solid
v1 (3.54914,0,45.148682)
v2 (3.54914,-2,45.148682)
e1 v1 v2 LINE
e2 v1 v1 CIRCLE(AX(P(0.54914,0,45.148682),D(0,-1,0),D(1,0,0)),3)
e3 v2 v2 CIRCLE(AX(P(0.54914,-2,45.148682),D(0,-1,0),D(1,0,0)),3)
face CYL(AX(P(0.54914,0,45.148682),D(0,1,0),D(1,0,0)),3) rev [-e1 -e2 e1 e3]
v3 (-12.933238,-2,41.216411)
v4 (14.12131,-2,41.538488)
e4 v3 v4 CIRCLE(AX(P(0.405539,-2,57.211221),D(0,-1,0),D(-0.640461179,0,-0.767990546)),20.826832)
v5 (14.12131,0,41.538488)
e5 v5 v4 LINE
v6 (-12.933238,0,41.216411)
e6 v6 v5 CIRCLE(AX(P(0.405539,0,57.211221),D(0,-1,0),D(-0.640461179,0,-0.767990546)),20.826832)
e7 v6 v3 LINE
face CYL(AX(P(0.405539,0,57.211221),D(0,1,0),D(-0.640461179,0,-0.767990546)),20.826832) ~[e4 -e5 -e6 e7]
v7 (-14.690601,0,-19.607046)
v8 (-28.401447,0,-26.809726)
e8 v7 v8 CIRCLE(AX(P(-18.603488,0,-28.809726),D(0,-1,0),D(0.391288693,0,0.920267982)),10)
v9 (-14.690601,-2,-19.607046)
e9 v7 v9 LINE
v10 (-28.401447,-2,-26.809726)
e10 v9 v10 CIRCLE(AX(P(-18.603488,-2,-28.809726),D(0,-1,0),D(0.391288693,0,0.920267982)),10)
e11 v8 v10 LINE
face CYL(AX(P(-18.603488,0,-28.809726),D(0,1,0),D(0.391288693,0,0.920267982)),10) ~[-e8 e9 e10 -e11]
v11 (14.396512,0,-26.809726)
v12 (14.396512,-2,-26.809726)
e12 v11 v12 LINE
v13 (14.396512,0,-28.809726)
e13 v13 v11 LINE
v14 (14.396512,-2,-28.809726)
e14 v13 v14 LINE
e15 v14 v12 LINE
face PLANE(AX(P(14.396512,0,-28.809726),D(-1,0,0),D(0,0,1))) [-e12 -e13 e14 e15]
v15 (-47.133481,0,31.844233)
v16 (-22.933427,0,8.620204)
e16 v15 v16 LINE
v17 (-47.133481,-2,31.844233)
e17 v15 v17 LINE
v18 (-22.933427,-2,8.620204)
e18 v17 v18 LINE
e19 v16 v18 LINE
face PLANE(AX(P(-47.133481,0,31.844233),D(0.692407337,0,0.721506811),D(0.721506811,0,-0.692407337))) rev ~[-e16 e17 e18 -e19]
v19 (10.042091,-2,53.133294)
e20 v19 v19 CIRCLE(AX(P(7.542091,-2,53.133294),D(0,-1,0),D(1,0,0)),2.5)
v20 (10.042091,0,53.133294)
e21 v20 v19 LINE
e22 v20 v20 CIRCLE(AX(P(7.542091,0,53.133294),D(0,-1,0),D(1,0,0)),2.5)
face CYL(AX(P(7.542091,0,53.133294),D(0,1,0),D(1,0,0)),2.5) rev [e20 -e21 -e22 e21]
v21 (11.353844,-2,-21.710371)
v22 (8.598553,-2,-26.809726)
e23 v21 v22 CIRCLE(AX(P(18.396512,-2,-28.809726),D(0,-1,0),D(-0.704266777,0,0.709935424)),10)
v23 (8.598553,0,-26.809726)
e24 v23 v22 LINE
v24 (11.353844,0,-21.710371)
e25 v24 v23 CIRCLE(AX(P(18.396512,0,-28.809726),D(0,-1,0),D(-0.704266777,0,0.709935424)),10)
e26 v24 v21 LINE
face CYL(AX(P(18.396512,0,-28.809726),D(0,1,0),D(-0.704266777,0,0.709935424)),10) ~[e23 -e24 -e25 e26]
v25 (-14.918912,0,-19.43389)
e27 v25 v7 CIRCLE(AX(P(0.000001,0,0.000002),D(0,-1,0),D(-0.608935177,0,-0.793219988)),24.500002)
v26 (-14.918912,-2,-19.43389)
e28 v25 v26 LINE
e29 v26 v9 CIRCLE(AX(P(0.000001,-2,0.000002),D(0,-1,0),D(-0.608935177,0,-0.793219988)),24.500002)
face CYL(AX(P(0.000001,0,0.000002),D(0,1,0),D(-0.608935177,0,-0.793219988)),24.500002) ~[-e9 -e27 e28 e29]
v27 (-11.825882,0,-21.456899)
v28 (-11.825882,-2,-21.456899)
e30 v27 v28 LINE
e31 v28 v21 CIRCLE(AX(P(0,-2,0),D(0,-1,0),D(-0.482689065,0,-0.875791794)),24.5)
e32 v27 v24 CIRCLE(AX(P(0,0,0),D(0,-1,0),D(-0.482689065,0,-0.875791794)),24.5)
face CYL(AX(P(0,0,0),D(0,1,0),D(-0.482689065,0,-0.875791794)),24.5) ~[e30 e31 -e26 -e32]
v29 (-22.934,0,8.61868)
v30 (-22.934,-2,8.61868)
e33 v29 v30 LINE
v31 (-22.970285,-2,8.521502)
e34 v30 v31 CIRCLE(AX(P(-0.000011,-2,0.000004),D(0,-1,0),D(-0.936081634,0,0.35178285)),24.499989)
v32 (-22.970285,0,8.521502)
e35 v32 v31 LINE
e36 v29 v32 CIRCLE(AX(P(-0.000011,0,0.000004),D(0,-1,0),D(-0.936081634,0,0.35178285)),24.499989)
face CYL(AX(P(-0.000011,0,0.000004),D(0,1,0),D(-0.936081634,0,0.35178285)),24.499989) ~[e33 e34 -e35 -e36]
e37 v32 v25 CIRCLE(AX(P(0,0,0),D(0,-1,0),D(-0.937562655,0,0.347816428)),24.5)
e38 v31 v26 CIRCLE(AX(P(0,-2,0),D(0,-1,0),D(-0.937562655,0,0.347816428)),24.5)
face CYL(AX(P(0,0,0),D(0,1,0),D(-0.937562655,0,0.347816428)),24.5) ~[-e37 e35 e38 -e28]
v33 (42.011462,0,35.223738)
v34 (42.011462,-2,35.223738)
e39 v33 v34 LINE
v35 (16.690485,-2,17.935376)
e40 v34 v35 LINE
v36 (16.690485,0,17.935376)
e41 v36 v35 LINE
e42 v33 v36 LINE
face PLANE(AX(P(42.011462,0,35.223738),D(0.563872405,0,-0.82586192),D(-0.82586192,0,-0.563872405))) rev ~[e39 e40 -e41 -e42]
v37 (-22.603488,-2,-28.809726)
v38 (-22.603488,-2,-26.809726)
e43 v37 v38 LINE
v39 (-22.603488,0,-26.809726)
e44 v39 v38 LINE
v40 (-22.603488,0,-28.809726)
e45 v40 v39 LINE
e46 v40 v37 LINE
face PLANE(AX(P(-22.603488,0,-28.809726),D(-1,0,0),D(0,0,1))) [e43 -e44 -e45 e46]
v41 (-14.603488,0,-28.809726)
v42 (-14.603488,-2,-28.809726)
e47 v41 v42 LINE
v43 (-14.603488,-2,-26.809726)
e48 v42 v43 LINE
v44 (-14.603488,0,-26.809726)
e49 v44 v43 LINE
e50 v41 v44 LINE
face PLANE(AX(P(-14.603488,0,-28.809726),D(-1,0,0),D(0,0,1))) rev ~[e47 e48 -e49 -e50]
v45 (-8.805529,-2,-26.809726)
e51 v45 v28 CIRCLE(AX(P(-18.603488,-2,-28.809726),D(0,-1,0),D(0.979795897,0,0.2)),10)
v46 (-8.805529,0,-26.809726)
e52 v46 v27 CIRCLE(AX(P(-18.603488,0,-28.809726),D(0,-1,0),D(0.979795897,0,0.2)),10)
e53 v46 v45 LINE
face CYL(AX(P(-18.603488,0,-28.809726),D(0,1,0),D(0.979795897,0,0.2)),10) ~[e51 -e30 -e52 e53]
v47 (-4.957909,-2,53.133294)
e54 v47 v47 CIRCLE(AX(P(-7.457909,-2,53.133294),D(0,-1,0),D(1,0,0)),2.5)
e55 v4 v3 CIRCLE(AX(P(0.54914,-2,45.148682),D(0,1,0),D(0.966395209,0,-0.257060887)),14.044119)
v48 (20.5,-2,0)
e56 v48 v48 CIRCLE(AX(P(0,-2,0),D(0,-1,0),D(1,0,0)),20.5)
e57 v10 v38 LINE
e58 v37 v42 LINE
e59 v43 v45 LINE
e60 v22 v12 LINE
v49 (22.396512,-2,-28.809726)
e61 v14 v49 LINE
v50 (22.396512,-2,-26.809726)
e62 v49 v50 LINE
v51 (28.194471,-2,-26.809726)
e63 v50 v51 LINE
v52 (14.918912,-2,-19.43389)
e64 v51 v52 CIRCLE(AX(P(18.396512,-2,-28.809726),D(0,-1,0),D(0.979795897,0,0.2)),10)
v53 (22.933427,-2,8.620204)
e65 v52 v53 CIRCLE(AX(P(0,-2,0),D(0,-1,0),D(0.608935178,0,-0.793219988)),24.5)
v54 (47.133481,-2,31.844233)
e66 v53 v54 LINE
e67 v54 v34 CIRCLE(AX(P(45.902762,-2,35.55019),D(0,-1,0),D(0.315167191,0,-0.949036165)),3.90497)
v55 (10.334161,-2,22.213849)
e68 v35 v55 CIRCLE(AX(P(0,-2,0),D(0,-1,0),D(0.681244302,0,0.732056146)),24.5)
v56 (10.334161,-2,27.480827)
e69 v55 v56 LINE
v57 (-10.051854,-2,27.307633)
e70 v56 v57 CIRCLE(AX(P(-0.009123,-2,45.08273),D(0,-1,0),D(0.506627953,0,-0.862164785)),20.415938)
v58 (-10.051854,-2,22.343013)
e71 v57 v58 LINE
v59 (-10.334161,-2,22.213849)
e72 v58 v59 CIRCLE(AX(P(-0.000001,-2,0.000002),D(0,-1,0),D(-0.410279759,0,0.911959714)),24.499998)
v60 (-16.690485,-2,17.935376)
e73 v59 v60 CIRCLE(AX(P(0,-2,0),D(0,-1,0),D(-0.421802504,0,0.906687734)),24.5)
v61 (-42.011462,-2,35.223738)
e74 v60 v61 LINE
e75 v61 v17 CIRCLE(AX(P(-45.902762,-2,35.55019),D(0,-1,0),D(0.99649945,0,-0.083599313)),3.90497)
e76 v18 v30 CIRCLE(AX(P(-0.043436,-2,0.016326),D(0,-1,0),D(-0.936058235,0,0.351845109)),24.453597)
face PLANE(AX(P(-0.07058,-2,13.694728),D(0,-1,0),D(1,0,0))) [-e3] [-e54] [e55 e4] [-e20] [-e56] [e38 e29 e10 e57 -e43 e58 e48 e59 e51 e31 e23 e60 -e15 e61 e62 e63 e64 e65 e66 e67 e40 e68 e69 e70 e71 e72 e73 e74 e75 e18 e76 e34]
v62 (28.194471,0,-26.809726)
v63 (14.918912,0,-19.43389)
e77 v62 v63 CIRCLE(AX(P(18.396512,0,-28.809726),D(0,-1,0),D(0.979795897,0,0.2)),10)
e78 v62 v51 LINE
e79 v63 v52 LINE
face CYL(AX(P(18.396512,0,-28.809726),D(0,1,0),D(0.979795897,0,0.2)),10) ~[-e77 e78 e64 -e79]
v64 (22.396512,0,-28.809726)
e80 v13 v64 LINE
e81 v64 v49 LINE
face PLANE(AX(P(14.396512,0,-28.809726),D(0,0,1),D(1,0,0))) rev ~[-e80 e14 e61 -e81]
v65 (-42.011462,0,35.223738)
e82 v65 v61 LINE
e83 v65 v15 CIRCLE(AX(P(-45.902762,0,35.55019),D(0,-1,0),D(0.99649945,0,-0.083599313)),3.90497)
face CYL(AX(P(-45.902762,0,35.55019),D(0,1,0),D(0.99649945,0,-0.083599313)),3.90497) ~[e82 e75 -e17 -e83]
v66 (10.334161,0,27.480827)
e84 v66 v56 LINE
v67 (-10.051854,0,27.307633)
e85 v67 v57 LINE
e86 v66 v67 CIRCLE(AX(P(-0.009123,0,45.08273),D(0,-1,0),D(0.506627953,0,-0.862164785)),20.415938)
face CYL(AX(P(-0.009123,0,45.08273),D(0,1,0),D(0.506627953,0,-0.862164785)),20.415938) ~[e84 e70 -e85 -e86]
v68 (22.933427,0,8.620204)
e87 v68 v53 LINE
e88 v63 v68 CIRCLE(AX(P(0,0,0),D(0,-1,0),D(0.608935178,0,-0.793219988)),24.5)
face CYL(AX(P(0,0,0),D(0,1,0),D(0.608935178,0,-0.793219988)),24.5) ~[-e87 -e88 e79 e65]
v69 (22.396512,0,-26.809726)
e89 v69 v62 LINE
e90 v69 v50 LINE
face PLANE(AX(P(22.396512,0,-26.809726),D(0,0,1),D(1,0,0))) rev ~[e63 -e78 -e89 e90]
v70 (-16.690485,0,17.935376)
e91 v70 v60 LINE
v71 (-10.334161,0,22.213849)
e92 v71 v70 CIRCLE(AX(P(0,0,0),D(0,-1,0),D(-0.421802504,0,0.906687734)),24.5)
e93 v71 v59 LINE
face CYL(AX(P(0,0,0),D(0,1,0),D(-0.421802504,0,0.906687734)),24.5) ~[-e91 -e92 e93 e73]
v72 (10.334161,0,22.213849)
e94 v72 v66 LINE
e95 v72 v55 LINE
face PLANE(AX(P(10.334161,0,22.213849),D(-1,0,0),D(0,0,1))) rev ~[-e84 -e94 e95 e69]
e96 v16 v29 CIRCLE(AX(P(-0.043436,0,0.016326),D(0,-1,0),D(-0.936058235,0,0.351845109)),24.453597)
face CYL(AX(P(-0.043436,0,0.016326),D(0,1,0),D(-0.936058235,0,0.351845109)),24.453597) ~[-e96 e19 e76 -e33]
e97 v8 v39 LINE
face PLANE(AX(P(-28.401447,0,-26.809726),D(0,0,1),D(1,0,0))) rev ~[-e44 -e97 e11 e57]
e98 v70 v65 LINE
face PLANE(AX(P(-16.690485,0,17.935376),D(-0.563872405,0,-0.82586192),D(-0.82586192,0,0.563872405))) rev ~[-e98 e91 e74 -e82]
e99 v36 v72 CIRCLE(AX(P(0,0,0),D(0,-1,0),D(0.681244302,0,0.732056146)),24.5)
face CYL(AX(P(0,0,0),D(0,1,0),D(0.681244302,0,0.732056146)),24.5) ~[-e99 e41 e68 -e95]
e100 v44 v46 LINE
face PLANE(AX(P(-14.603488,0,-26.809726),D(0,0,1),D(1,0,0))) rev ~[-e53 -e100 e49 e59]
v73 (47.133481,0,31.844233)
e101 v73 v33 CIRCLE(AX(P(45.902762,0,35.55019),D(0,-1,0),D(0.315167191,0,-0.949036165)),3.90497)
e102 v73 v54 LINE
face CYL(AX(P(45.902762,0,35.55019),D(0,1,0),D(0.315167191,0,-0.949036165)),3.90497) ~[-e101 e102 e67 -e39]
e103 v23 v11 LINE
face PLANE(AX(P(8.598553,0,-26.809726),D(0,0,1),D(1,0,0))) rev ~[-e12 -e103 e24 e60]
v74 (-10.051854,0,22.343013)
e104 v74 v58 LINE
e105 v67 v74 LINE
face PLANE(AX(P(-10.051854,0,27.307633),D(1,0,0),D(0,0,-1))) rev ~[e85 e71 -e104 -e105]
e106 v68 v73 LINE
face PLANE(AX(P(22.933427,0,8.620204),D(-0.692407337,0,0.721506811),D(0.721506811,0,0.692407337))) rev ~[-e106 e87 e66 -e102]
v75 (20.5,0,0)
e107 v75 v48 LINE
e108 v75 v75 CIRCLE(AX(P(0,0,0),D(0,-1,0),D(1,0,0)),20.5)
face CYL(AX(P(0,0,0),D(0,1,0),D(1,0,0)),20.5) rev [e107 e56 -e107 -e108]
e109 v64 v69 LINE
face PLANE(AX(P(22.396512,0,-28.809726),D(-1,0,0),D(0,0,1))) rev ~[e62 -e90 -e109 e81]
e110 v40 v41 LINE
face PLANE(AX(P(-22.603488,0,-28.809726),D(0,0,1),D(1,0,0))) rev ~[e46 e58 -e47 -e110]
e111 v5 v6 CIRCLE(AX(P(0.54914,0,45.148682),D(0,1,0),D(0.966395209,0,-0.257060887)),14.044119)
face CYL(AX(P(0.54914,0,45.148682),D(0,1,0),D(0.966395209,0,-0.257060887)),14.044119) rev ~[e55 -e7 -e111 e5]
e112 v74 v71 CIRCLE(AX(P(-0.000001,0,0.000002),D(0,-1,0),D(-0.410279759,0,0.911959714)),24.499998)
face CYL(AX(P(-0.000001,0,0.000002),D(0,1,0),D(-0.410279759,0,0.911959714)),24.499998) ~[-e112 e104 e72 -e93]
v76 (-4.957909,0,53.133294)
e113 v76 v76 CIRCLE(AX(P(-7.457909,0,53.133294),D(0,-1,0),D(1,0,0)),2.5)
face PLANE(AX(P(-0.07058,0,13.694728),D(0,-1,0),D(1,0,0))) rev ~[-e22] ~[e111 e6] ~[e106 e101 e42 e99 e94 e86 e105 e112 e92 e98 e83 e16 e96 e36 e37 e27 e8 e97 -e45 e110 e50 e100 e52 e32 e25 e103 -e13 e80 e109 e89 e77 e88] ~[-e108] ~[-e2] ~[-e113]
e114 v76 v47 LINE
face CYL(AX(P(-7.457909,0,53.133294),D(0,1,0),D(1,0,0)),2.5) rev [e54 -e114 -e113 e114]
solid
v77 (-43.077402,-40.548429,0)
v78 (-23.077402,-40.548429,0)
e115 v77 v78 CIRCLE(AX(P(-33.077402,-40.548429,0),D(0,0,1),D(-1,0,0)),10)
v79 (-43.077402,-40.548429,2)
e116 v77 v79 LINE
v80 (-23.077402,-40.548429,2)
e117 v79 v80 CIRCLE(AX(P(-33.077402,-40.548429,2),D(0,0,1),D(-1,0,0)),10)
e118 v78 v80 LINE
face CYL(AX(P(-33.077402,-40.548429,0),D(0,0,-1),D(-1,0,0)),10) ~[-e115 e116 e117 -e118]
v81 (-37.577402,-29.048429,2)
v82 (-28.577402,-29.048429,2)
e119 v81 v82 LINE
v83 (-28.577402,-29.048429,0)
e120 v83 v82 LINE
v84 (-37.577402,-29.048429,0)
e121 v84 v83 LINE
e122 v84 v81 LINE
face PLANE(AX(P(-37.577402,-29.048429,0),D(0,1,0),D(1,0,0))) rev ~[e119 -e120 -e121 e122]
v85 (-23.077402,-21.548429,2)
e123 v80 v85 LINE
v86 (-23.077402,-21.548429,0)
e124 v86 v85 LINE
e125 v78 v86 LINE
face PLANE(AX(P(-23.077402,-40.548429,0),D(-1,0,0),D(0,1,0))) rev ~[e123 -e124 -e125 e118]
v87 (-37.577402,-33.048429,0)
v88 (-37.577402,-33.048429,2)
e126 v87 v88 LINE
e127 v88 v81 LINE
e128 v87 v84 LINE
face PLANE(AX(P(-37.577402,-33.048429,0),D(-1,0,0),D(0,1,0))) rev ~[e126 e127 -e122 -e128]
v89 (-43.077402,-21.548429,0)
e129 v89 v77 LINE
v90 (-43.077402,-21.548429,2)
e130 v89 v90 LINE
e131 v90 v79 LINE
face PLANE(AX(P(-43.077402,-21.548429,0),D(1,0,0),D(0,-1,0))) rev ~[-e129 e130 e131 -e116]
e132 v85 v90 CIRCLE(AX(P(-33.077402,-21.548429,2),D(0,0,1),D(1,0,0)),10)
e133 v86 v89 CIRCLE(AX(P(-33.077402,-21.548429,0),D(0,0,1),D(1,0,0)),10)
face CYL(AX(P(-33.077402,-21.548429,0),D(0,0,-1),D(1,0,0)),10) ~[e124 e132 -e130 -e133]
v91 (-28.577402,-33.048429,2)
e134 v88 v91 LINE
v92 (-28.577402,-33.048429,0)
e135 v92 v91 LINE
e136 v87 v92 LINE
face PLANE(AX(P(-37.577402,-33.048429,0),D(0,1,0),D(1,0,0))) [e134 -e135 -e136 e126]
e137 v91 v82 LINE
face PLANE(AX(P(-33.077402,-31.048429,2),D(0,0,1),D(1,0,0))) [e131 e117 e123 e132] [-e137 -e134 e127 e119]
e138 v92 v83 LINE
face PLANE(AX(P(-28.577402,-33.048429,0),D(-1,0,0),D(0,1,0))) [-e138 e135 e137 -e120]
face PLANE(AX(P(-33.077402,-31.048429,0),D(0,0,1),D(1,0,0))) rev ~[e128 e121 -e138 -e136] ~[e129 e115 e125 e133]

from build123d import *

# Parameters (mm, degrees)
F0_R     = 20.5
F0_R_2   = 2.5
F0_R_3   = 3
F0_W     = 8
F0_H     = 2
F1_DEPTH = 2
F2_W     = 9
F2_H     = 4
F3_DEPTH = 2


# Not quite as in the source:
# - a feature names something its author has since deleted; it is built from what else it names


with BuildPart() as f1:
    # F0 (on Front) → F1 (new body)
    with BuildSketch(Plane.XZ):
        with BuildLine():
            Line((-10.0518541032, 27.3076325654), (-10.0518541032, 22.3430129814))
            ThreePointArc((-10.0518541032, 22.3430129814), (-10.1932123132, 22.2788783995), (-10.3341613447, 22.2138494931))
            ThreePointArc((-10.3341613447, 22.2138494931), (-13.6806146729, 20.3246348595), (-16.6904854096, 17.9353755688))
            Line((-16.6904854096, 17.9353755688), (-42.0114619192, 35.2237376845))
            ThreePointArc((-42.0114619192, 35.2237376845), (-48.0533290823, 38.8096157049), (-47.1334807155, 31.8442328026))
            Line((-47.1334807155, 31.8442328026), (-22.9334270643, 8.620204353))
            ThreePointArc((-22.9334270643, 8.620204353), (-22.9337135716, 8.6194420827), (-22.9340000535, 8.6186798029))
            ThreePointArc((-22.9340000535, 8.6186798029), (-22.9521939831, 8.5701103472), (-22.9702850527, 8.5215024848))
            ThreePointArc((-22.9702850527, 8.5215024848), (-23.543020169, -6.7805752945), (-14.9189118524, -19.4338897069))
            ThreePointArc((-14.9189118524, -19.4338897069), (-14.8050096032, -19.5208014858), (-14.6906010516, -19.6070456914))
            ThreePointArc((-14.6906010516, -19.6070456914), (-23.2540973357, -19.9569387989), (-28.4014469494, -26.809725513))
            Line((-28.4014469494, -26.809725513), (-22.6034879783, -26.809725513))
            Line((-22.6034879783, -26.809725513), (-14.6034879783, -26.809725513))
            Line((-14.6034879783, -26.809725513), (-8.8055290071, -26.809725513))
            ThreePointArc((-8.8055290071, -26.809725513), (-9.8942672501, -23.8955140495), (-11.8258820824, -21.4568989598))
            ThreePointArc((-11.8258820824, -21.4568989598), (-0.2678936029, -24.4985353239), (11.3538442484, -21.7103712724))
            ThreePointArc((11.3538442484, -21.7103712724), (9.5986412165, -24.0560459597), (8.5985530506, -26.809725513))
            Line((8.5985530506, -26.809725513), (14.3965120217, -26.809725513))
            Line((14.3965120217, -26.809725513), (22.3965120217, -26.809725513))
            Line((22.3965120217, -26.809725513), (28.1944709929, -26.809725513))
            ThreePointArc((28.1944709929, -26.809725513), (23.2532055786, -20.0682995598), (14.9189118524, -19.4338897069))
            ThreePointArc((14.9189118524, -19.4338897069), (23.5575452615, -6.7299376857), (22.9334270643, 8.620204353))
            Line((22.9334270643, 8.620204353), (47.1334807155, 31.8442328026))
            ThreePointArc((47.1334807155, 31.8442328026), (48.0533290823, 38.8096157049), (42.0114619192, 35.2237376845))
            Line((42.0114619192, 35.2237376845), (16.6904854096, 17.9353755688))
            ThreePointArc((16.6904854096, 17.9353755688), (13.6806146729, 20.3246348595), (10.3341613447, 22.2138494931))
            Line((10.3341613447, 22.2138494931), (10.3341613447, 27.4808270977))
            ThreePointArc((10.3341613447, 27.4808270977), (-0.1825659758, 65.4979309649), (-10.0518541032, 27.3076325654))
        make_face()
        Circle(F0_R, mode=Mode.SUBTRACT)
        with Locations((-7.4579087086, 53.1332939863)):
            Circle(F0_R_2, mode=Mode.SUBTRACT)
        with BuildLine():
            ThreePointArc((14.1213098541, 41.5384881198), (0.7163199464, 31.1055576115), (-12.9332384095, 41.2164106965))
            ThreePointArc((-12.9332384095, 41.2164106965), (0.6534592539, 36.3858645098), (14.1213098541, 41.5384881198))
        make_face(mode=Mode.SUBTRACT)
        with Locations((0.5491401715, 45.1486819078)):
            Circle(F0_R_3, mode=Mode.SUBTRACT)
        with Locations((7.5420912914, 53.1332939863)):
            Circle(F0_R_2, mode=Mode.SUBTRACT)
        with Locations((18.3965120217, -27.809725513)):
            Rectangle(F0_W, F0_H)
        with Locations((-18.6034879783, -27.809725513)):
            Rectangle(F0_W, F0_H)
    extrude(amount=F1_DEPTH)


with BuildPart() as f3:
    # F2 (on Top) → F3 (new body)
    with BuildSketch(Plane.XY):
        with BuildLine():
            ThreePointArc((-23.0774022639, -21.5484288931), (-33.0774022639, -11.5484288931), (-43.0774022639, -21.5484288931))
            Line((-43.0774022639, -21.5484288931), (-43.0774022639, -40.5484288931))
            ThreePointArc((-43.0774022639, -40.5484288931), (-33.0774022639, -50.5484288931), (-23.0774022639, -40.5484288931))
            Line((-23.0774022639, -40.5484288931), (-23.0774022639, -21.5484288931))
        make_face()
        with Locations((-33.0774022639, -31.0484288931)):
            Rectangle(F2_W, F2_H, mode=Mode.SUBTRACT)
    extrude(amount=F3_DEPTH)


solid = Compound([f1.part, f3.part])
